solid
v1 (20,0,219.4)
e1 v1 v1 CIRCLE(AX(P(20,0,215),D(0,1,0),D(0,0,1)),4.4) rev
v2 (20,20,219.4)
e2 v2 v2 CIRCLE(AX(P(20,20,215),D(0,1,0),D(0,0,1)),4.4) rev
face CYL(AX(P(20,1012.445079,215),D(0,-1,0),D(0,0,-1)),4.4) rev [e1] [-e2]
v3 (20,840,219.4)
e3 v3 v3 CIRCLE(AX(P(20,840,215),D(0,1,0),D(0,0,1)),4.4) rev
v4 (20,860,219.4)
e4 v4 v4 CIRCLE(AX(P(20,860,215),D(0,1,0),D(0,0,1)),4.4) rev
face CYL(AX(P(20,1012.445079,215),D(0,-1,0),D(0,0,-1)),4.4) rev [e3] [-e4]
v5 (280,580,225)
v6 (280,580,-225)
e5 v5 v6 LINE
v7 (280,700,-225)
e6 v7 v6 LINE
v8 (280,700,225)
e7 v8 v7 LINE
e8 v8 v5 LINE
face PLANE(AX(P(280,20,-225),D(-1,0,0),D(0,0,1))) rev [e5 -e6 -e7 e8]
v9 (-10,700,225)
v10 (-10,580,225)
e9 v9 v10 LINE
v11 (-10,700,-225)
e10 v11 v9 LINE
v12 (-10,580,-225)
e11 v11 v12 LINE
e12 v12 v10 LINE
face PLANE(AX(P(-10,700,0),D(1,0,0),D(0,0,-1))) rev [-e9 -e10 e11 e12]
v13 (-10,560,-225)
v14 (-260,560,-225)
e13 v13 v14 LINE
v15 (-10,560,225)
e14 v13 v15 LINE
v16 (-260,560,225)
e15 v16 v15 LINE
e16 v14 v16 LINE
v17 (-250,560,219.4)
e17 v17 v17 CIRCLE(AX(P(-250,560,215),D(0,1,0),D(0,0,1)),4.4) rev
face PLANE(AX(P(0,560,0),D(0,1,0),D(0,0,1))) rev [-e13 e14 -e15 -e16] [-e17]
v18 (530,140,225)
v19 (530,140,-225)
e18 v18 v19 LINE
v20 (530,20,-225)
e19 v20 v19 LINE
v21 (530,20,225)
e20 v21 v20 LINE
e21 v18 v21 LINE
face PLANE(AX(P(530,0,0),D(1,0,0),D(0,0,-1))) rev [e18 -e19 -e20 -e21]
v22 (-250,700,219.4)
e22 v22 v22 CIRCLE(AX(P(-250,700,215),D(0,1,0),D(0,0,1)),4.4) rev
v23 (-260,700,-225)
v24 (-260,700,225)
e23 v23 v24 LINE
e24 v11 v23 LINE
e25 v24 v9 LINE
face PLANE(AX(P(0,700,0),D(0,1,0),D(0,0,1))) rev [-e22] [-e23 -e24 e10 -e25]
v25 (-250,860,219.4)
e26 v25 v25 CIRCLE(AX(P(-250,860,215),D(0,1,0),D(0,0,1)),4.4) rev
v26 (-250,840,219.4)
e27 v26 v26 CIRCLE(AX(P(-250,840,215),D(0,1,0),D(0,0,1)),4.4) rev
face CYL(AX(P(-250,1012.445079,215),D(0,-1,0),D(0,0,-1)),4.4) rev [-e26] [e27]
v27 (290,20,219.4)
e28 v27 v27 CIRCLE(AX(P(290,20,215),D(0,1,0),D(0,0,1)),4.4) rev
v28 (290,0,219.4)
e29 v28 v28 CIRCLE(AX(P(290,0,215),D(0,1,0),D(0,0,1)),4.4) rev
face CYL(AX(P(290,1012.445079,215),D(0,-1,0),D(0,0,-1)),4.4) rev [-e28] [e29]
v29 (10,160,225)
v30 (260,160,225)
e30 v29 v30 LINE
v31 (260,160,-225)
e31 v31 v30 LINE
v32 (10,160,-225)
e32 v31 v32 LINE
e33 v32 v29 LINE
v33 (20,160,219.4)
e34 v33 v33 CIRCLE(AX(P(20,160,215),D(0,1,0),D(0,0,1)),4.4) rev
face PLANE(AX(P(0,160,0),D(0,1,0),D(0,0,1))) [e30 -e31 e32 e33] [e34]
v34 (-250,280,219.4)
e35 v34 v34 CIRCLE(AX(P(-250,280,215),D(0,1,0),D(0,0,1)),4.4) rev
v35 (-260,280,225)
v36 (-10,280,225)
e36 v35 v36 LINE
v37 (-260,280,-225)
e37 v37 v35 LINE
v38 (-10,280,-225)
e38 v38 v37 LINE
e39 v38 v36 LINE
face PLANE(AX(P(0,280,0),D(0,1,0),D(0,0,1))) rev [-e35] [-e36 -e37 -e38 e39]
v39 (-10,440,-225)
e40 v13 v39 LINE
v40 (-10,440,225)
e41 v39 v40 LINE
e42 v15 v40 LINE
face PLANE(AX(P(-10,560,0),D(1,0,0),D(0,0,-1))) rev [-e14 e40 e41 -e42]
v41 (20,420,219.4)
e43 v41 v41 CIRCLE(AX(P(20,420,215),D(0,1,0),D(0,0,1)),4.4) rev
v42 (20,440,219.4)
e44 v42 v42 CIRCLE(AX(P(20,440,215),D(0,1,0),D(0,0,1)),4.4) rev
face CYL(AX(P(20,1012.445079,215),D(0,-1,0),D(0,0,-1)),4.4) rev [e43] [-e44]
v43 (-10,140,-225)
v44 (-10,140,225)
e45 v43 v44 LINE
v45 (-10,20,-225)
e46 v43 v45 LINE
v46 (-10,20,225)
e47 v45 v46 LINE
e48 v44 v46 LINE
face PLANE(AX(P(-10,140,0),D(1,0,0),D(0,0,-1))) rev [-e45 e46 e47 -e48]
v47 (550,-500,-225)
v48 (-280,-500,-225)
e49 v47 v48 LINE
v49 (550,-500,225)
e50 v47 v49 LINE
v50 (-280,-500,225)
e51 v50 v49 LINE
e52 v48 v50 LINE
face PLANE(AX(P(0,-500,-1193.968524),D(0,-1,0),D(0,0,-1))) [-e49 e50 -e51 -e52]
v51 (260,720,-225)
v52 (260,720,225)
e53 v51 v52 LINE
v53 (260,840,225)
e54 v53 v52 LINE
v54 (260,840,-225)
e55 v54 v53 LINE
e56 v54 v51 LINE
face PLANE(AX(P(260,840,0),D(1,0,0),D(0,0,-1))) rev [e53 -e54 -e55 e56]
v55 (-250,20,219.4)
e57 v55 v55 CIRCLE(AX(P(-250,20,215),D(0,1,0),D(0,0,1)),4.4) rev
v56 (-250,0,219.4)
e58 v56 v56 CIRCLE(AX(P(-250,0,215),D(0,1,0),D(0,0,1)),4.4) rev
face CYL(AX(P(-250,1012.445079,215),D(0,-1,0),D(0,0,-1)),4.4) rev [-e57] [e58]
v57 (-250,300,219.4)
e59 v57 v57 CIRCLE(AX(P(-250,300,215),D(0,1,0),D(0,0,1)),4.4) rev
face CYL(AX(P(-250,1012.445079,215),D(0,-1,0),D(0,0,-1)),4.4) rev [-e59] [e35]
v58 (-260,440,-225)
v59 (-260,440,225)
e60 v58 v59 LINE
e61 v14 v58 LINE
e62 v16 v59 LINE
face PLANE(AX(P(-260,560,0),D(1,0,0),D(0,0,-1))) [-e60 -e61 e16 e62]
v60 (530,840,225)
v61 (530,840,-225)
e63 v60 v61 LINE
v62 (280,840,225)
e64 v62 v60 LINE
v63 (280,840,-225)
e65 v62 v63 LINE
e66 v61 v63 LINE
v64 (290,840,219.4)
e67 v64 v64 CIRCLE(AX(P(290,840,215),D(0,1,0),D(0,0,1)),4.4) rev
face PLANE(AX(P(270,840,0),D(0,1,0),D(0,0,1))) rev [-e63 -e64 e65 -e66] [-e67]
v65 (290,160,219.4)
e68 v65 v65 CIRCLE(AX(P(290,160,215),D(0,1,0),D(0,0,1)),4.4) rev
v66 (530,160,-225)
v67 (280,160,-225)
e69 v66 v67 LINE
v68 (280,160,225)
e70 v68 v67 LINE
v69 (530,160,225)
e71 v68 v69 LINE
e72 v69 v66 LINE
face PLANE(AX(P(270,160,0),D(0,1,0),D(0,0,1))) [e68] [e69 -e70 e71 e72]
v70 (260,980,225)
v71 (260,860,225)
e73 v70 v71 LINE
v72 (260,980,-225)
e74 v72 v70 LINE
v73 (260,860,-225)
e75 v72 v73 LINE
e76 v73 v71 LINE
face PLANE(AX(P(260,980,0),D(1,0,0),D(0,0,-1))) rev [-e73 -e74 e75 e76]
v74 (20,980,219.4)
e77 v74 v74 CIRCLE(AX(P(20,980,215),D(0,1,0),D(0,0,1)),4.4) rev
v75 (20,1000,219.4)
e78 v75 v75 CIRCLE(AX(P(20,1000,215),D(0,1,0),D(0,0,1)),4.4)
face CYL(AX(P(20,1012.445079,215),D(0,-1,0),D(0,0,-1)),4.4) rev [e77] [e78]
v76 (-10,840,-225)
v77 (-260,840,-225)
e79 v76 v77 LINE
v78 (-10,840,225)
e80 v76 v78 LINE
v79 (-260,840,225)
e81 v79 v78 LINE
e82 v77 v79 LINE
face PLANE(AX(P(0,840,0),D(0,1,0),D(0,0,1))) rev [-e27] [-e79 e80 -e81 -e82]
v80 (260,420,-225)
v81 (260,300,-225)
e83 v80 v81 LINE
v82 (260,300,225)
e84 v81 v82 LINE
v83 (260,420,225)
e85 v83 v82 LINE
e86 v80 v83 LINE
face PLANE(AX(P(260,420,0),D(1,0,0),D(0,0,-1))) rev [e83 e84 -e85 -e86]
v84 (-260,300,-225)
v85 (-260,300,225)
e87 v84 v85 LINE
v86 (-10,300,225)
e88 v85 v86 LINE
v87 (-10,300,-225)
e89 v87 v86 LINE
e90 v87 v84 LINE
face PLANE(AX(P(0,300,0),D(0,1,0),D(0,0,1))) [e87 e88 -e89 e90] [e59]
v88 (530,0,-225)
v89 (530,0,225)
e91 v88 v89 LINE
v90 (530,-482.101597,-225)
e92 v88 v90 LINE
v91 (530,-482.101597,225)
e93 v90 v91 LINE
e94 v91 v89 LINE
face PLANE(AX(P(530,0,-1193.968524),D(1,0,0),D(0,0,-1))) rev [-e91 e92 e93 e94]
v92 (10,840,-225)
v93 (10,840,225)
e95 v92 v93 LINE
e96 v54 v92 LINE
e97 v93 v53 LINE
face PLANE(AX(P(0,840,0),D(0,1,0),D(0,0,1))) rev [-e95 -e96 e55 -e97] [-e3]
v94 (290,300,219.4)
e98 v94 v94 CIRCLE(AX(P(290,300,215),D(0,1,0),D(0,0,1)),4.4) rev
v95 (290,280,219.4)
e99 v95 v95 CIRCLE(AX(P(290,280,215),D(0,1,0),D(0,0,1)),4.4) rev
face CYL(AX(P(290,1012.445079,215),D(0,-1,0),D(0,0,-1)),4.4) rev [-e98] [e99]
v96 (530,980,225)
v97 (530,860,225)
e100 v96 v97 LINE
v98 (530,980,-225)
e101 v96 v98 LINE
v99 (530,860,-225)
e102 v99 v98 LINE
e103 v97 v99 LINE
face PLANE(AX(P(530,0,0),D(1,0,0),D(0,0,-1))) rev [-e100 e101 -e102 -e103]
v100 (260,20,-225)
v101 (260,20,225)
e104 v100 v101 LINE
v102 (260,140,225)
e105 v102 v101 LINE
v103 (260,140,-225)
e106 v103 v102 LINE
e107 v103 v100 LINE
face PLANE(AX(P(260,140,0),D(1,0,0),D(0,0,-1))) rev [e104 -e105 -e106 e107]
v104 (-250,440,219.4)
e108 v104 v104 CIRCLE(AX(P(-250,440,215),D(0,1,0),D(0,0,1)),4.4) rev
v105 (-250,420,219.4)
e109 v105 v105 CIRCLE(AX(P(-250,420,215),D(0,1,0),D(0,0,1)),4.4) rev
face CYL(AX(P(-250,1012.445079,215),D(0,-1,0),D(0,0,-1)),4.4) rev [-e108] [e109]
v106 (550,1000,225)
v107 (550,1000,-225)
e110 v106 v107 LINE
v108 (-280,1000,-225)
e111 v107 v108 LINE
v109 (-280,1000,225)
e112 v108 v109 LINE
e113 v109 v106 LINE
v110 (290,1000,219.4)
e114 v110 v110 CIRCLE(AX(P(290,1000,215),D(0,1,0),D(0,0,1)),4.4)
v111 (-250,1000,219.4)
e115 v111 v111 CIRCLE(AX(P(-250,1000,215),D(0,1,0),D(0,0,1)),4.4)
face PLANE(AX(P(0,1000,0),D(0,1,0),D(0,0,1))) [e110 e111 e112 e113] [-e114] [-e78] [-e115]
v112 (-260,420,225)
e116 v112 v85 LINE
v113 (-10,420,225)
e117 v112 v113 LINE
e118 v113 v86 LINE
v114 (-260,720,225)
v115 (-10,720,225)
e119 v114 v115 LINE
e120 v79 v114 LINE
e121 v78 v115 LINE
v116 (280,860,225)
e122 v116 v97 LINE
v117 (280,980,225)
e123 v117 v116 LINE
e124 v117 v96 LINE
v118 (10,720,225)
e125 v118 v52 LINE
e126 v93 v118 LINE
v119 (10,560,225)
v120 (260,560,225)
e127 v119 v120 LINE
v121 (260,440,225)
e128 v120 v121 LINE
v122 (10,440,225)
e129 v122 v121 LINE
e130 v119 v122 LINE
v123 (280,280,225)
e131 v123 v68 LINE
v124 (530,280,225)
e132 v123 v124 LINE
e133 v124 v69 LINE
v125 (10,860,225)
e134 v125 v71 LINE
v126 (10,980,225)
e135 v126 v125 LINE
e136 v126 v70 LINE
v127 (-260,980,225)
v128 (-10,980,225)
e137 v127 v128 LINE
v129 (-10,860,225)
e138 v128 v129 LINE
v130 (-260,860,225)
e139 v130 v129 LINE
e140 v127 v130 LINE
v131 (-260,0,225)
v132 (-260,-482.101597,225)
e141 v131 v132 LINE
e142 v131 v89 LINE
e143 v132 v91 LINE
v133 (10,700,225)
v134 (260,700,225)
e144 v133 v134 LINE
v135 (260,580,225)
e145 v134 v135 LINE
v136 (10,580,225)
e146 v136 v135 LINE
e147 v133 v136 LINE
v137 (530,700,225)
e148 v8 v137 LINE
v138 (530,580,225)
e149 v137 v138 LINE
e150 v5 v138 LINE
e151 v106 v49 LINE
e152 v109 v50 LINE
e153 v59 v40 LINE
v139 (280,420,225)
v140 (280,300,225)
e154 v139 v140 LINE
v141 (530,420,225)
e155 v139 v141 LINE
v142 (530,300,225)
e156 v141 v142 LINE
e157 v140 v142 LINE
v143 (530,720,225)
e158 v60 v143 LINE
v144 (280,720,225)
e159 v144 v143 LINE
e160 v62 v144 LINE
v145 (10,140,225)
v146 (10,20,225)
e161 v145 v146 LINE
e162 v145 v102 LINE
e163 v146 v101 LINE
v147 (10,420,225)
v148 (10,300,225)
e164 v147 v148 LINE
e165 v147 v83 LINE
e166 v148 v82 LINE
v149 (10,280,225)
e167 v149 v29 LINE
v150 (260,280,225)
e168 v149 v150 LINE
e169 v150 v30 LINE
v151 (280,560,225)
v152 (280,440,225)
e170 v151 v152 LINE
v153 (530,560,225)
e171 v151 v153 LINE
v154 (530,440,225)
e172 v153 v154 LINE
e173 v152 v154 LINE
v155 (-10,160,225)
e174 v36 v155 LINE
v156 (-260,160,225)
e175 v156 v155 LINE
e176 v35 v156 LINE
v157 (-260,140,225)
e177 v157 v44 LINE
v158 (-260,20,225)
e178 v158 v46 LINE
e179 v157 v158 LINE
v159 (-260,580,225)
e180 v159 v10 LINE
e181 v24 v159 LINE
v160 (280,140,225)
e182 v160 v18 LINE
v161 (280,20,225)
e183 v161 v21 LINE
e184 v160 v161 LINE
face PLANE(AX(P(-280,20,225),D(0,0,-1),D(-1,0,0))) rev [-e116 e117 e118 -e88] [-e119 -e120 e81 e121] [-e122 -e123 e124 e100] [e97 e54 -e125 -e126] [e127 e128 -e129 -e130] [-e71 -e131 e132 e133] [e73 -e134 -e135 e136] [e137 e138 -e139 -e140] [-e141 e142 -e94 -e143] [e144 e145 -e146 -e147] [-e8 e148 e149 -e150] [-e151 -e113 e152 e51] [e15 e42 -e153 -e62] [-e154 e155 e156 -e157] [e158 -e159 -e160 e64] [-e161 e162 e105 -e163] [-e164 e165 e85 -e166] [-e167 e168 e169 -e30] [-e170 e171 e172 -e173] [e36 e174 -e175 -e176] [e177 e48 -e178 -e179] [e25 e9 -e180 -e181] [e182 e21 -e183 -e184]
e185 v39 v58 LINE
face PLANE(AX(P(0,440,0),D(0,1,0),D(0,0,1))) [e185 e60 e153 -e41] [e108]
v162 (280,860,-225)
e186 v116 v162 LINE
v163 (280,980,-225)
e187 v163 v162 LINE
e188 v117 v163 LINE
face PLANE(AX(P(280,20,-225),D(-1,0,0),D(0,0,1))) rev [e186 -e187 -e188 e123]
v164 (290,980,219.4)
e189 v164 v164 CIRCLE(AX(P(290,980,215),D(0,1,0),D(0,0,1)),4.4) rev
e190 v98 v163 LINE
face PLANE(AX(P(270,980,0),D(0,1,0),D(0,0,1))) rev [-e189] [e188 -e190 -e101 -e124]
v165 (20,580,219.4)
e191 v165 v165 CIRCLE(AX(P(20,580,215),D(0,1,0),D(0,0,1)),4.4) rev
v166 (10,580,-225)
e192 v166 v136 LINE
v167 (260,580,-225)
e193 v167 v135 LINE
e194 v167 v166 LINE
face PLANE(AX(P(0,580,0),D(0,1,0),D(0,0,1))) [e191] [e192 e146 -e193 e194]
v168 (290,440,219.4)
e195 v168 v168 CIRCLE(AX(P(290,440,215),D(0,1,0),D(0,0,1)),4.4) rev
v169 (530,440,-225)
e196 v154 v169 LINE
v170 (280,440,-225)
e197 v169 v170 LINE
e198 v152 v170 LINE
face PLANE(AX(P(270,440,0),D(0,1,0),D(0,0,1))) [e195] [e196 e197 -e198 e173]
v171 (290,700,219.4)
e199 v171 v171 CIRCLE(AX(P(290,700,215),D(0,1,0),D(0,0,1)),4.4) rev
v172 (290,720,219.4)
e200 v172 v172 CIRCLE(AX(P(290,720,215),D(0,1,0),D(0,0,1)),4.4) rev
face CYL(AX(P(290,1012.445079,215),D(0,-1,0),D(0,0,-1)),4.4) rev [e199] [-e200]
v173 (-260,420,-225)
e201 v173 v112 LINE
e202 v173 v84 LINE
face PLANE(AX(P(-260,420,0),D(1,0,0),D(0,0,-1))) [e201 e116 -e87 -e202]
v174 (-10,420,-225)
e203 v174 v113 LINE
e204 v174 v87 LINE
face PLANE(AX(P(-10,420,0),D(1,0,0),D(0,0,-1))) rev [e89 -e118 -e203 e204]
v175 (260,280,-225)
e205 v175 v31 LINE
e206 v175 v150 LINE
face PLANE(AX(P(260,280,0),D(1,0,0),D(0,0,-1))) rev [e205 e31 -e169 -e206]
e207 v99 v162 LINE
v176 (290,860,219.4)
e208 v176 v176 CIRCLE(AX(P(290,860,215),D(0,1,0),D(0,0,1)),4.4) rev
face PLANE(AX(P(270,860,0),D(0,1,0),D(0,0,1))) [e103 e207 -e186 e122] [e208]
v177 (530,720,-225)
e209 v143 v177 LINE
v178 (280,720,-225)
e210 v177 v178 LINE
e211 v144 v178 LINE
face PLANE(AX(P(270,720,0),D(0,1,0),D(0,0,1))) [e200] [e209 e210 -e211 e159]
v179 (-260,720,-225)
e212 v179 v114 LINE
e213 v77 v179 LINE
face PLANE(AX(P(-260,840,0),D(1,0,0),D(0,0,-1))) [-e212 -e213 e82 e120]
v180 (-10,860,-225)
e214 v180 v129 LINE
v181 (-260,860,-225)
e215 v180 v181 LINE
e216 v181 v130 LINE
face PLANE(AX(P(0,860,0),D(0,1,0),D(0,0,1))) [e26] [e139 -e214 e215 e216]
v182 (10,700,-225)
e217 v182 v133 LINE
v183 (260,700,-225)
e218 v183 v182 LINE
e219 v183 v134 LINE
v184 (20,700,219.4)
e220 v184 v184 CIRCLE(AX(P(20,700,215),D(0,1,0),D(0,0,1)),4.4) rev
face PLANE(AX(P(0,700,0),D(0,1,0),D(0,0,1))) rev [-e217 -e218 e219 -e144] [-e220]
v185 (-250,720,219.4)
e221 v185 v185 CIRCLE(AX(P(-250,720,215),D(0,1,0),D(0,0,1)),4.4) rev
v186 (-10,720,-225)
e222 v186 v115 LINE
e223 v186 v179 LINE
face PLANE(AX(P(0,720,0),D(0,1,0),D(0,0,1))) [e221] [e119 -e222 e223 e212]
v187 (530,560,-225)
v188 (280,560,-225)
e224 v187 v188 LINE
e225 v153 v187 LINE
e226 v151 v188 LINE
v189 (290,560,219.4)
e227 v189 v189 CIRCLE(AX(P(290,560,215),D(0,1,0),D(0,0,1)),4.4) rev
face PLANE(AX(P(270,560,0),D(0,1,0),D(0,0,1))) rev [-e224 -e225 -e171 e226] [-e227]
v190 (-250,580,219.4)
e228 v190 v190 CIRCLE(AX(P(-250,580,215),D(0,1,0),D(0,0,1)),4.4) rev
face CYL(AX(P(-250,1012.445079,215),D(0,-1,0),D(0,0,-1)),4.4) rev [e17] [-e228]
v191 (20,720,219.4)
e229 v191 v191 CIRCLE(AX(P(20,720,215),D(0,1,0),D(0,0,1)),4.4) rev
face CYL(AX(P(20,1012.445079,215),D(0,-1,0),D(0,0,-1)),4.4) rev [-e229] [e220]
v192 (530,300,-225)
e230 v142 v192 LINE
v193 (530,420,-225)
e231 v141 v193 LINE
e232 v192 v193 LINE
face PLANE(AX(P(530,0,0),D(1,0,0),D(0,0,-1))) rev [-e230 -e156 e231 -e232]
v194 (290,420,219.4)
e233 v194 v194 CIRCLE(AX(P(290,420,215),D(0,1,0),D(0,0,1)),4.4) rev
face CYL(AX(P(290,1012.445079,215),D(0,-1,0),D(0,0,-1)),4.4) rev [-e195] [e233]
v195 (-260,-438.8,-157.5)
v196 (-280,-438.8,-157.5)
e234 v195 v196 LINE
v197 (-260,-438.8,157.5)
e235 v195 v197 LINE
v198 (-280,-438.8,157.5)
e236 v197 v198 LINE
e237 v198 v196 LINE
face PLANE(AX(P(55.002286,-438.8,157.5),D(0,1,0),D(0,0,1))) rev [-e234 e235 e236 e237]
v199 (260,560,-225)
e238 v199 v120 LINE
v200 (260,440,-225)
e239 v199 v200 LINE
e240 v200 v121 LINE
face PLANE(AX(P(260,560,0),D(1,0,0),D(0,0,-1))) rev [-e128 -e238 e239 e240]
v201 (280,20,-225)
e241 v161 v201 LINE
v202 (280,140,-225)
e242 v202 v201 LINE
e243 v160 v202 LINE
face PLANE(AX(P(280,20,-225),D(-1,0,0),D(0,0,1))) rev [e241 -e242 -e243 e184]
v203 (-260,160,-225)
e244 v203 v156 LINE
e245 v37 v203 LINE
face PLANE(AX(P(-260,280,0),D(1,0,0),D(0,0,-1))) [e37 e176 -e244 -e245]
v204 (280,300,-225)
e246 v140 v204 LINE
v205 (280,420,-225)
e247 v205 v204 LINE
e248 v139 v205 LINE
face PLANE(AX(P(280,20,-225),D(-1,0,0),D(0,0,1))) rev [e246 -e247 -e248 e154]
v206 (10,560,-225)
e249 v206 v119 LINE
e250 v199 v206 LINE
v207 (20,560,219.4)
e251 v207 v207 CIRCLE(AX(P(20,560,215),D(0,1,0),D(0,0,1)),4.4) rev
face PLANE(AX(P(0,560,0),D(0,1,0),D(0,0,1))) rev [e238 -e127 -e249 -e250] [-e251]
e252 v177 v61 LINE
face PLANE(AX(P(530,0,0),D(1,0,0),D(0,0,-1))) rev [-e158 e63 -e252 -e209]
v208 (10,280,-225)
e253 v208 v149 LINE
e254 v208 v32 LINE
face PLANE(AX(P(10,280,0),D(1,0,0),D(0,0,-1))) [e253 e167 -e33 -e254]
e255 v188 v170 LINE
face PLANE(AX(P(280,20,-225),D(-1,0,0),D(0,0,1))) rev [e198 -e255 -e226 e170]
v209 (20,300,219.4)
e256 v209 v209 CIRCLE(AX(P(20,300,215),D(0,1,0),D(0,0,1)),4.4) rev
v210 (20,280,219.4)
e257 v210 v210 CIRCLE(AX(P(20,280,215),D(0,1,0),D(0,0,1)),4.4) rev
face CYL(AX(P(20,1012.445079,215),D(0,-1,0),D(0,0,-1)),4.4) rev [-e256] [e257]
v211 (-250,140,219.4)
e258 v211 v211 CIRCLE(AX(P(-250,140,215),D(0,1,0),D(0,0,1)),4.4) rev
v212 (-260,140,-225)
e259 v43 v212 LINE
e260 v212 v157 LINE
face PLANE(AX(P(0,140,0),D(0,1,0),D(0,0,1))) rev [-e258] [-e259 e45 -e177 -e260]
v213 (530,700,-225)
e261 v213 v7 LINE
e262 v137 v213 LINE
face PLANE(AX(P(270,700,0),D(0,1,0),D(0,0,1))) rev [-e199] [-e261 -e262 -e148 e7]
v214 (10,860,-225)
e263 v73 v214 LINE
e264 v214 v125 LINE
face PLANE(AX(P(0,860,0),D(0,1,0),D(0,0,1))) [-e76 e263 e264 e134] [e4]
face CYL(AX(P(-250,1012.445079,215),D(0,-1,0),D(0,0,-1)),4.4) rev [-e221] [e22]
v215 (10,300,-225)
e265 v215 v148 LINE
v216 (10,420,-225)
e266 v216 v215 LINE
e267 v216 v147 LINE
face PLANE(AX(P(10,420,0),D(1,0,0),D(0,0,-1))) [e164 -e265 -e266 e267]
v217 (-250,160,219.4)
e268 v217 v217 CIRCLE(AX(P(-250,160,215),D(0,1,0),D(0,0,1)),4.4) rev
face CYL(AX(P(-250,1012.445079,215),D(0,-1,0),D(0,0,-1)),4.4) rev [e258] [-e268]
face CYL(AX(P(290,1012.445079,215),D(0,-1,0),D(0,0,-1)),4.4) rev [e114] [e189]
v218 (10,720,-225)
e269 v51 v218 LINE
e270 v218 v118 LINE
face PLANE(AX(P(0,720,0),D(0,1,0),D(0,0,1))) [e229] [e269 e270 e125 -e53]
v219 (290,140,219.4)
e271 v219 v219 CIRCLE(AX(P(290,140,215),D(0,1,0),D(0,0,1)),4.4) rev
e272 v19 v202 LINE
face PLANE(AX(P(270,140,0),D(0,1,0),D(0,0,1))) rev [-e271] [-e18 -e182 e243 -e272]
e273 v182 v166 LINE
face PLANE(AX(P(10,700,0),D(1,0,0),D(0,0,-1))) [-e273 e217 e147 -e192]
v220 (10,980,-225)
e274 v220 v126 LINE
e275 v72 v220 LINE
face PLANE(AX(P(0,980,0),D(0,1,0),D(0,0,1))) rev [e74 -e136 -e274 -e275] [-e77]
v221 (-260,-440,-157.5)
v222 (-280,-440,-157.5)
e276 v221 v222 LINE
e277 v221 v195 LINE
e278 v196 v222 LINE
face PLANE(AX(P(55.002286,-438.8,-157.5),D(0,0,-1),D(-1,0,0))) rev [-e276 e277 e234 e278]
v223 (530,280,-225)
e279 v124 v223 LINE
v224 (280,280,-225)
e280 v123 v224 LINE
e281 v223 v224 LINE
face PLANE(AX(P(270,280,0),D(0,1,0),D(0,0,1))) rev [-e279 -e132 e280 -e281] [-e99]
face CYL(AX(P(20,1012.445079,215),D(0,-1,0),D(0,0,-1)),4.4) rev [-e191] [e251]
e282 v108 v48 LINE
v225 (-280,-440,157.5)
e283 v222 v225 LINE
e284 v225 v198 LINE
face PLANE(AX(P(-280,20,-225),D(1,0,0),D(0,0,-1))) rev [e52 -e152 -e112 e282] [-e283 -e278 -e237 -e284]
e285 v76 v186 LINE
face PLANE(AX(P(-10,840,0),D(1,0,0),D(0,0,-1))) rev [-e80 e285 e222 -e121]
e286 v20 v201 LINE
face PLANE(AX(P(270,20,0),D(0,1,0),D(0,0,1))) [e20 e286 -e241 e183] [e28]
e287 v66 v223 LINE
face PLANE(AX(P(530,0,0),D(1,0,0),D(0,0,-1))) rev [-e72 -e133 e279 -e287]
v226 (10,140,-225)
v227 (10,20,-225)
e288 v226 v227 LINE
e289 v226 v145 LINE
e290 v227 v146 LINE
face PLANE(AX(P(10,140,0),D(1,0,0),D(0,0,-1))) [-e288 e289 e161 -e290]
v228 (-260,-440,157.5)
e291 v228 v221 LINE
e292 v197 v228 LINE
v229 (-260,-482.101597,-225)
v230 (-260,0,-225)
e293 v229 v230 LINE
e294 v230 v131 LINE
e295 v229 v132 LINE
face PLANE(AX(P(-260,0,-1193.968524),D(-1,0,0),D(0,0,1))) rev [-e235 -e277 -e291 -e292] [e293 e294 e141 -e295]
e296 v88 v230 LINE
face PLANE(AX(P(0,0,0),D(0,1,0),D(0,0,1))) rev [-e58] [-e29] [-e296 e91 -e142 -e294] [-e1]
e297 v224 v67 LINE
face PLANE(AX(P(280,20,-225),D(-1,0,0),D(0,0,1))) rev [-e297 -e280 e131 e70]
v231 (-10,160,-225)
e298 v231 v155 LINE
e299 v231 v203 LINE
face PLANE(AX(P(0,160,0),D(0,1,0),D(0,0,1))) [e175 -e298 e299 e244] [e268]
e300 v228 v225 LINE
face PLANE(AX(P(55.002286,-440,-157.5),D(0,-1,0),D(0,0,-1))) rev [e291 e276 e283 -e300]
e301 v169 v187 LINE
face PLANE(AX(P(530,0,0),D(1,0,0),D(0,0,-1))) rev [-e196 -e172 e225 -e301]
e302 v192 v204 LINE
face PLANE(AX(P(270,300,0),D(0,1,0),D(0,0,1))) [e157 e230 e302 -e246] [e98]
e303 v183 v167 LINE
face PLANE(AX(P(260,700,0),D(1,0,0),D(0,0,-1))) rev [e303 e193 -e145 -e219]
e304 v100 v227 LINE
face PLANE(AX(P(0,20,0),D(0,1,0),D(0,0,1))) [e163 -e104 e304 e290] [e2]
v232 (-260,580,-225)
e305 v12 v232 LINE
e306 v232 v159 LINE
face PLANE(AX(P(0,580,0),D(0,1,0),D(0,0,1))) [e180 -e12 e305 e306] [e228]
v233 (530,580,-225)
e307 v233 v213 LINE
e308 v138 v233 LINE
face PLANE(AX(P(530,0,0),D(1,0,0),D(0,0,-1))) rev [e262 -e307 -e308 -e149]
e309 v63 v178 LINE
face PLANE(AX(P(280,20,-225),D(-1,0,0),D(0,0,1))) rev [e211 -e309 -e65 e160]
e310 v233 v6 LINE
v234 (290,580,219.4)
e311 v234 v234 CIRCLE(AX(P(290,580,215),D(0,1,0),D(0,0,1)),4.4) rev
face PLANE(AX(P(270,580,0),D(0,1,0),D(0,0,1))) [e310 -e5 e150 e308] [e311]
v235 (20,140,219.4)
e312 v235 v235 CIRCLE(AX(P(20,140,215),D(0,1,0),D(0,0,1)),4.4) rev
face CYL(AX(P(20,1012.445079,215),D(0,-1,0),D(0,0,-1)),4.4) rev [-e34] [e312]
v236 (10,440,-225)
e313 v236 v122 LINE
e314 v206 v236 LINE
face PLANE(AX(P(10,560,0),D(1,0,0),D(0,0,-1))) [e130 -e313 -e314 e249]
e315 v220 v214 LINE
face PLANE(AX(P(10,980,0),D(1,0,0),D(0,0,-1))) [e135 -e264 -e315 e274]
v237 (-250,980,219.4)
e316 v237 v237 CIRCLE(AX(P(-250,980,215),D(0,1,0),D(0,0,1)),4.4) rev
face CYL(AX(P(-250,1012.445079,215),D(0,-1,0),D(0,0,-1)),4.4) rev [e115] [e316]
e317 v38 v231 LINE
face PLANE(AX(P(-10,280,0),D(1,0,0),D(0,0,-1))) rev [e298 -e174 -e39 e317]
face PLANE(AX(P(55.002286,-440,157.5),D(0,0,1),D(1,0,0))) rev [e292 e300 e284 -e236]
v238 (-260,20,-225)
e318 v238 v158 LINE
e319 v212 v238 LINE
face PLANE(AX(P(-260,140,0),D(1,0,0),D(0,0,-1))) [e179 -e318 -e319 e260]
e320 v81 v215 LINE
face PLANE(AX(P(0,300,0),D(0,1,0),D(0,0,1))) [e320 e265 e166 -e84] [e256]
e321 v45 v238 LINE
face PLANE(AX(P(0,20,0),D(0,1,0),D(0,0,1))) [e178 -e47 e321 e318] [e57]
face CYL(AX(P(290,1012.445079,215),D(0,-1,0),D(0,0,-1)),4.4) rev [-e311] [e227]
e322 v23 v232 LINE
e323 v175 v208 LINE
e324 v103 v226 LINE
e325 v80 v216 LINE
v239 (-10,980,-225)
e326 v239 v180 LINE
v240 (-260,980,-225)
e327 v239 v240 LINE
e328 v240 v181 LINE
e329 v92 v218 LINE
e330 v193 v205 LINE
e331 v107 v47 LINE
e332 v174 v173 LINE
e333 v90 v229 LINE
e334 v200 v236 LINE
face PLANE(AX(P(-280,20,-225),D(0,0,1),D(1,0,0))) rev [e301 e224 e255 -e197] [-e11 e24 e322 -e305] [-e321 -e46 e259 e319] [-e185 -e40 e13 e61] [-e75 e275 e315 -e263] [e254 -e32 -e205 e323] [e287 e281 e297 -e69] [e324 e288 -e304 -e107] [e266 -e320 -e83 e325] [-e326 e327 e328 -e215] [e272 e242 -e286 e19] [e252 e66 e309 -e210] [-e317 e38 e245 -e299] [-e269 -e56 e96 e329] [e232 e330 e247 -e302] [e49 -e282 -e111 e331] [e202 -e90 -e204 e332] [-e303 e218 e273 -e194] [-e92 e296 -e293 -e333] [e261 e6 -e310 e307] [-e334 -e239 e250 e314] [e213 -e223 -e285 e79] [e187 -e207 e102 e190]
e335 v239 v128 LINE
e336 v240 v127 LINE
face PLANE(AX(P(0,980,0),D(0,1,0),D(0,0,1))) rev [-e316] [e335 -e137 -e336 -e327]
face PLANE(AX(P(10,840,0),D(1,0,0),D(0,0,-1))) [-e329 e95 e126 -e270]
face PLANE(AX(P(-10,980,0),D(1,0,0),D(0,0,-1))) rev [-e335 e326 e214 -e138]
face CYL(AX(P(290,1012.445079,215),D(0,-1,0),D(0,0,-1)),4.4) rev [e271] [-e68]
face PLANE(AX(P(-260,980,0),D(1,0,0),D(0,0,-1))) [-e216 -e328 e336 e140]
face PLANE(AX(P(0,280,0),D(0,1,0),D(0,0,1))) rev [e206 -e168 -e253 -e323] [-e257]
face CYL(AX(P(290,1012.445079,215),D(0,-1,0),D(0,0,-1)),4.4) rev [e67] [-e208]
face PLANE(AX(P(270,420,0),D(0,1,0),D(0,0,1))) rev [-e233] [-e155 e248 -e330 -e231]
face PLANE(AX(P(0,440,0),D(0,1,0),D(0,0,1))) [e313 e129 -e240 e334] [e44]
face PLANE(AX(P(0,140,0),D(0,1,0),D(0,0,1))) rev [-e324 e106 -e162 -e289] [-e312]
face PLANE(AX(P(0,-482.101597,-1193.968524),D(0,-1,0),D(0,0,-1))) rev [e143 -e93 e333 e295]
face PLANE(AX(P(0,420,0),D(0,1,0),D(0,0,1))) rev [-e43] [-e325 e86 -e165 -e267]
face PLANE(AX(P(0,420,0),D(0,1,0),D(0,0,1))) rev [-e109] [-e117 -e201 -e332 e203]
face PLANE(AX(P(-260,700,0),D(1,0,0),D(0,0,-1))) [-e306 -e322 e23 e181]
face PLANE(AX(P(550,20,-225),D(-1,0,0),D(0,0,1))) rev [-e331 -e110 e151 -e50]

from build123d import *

# Parameters (mm, degrees)
SKETCH1_W                      = 560
SKETCH1_H                      = 450
BOSS_EXTRUDE1_DEPTH            = 20
SKETCH3_W                      = 20
SKETCH3_H                      = 450
BOSS_EXTRUDE2_DEPTH            = 120
LPATTERN2_COUNT                = 7
LPATTERN2_PITCH                = 140
LPATTERN5_COUNT                = 2
LPATTERN5_PITCH                = 270
LPATTERN5_COUNT_DIR2           = 14
LPATTERN5_PITCH_DIR2           = 140
SKETCH6_W                      = 450
SKETCH6_H                      = 1000
BOSS_EXTRUDE5_DEPTH            = 20
BOSS_EXTRUDE6_DEPTH            = 450
CUT_EXTRUDE1_REACH             = 1486.158
SKETCH10_R                     = 4.4
CUT_EXTRUDE1_DIRECTION_2_REACH = 1486.158
LPATTERN6_COUNT                = 3
LPATTERN6_PITCH                = 270
SKETCH13_W                     = 315
SKETCH13_H                     = 1.2
CUT_EXTRUDE3_DEPTH             = 20


with BuildPart() as part:
    # Sketch1 → Boss-Extrude1 (new body)
    with BuildSketch(Plane(origin=(0, 0, 0), x_dir=(1, 0, 0), z_dir=(0, 1, 0))):
        Rectangle(SKETCH1_W, SKETCH1_H)
    boss_extrude1 = extrude(amount=BOSS_EXTRUDE1_DEPTH)

    # Sketch3 → Boss-Extrude2 (add)
    with BuildSketch(Plane(origin=(0, 20, 0), x_dir=(1, 0, 0), z_dir=(0, 1, 0))):
        with Locations((-270, 0)):
            Rectangle(SKETCH3_W, SKETCH3_H)
        Rectangle(SKETCH3_W, SKETCH3_H)
        with Locations((270, 0)):
            Rectangle(SKETCH3_W, SKETCH3_H)
    extrude(amount=BOSS_EXTRUDE2_DEPTH)


with BuildPart() as lpattern2_1:
    # LPattern2: pattern copy
    add(part.part.moved(Location(Vector(0, 1, 0) * (1 * LPATTERN2_PITCH))))


with BuildPart() as lpattern2_2:
    # LPattern2: pattern copy
    add(part.part.moved(Location(Vector(0, 1, 0) * (2 * LPATTERN2_PITCH))))


with BuildPart() as lpattern2_3:
    # LPattern2: pattern copy
    add(part.part.moved(Location(Vector(0, 1, 0) * (3 * LPATTERN2_PITCH))))


with BuildPart() as lpattern2_4:
    # LPattern2: pattern copy
    add(part.part.moved(Location(Vector(0, 1, 0) * (4 * LPATTERN2_PITCH))))


with BuildPart() as lpattern2_5:
    # LPattern2: pattern copy
    add(part.part.moved(Location(Vector(0, 1, 0) * (5 * LPATTERN2_PITCH))))


with BuildPart() as lpattern2_6:
    # LPattern2: pattern copy
    add(part.part.moved(Location(Vector(0, 1, 0) * (6 * LPATTERN2_PITCH))))


with BuildPart() as lpattern5_1:
    # LPattern5: pattern copy
    add(boss_extrude1.moved(Location(Vector(1, 0, 0) * (0 * LPATTERN5_PITCH) + Vector(0, 1, 0) * (1 * LPATTERN5_PITCH_DIR2))))


with BuildPart() as lpattern5_2:
    # LPattern5: pattern copy
    add(boss_extrude1.moved(Location(Vector(1, 0, 0) * (0 * LPATTERN5_PITCH) + Vector(0, 1, 0) * (2 * LPATTERN5_PITCH_DIR2))))


with BuildPart() as lpattern5_3:
    # LPattern5: pattern copy
    add(boss_extrude1.moved(Location(Vector(1, 0, 0) * (0 * LPATTERN5_PITCH) + Vector(0, 1, 0) * (3 * LPATTERN5_PITCH_DIR2))))


with BuildPart() as lpattern5_4:
    # LPattern5: pattern copy
    add(boss_extrude1.moved(Location(Vector(1, 0, 0) * (0 * LPATTERN5_PITCH) + Vector(0, 1, 0) * (4 * LPATTERN5_PITCH_DIR2))))


with BuildPart() as lpattern5_5:
    # LPattern5: pattern copy
    add(boss_extrude1.moved(Location(Vector(1, 0, 0) * (0 * LPATTERN5_PITCH) + Vector(0, 1, 0) * (5 * LPATTERN5_PITCH_DIR2))))


with BuildPart() as lpattern5_6:
    # LPattern5: pattern copy
    add(boss_extrude1.moved(Location(Vector(1, 0, 0) * (0 * LPATTERN5_PITCH) + Vector(0, 1, 0) * (6 * LPATTERN5_PITCH_DIR2))))


with BuildPart() as lpattern5_7:
    # LPattern5: pattern copy
    add(boss_extrude1.moved(Location(Vector(1, 0, 0) * (0 * LPATTERN5_PITCH) + Vector(0, 1, 0) * (7 * LPATTERN5_PITCH_DIR2))))


with BuildPart() as lpattern5_8:
    # LPattern5: pattern copy
    add(boss_extrude1.moved(Location(Vector(1, 0, 0) * (1 * LPATTERN5_PITCH) + Vector(0, 1, 0) * (0 * LPATTERN5_PITCH_DIR2))))


with BuildPart() as lpattern5_9:
    # LPattern5: pattern copy
    add(boss_extrude1.moved(Location(Vector(1, 0, 0) * (1 * LPATTERN5_PITCH) + Vector(0, 1, 0) * (1 * LPATTERN5_PITCH_DIR2))))


with BuildPart() as lpattern5_10:
    # LPattern5: pattern copy
    add(boss_extrude1.moved(Location(Vector(1, 0, 0) * (1 * LPATTERN5_PITCH) + Vector(0, 1, 0) * (2 * LPATTERN5_PITCH_DIR2))))


with BuildPart() as lpattern5_11:
    # LPattern5: pattern copy
    add(boss_extrude1.moved(Location(Vector(1, 0, 0) * (1 * LPATTERN5_PITCH) + Vector(0, 1, 0) * (3 * LPATTERN5_PITCH_DIR2))))


with BuildPart() as lpattern5_12:
    # LPattern5: pattern copy
    add(boss_extrude1.moved(Location(Vector(1, 0, 0) * (1 * LPATTERN5_PITCH) + Vector(0, 1, 0) * (4 * LPATTERN5_PITCH_DIR2))))


with BuildPart() as lpattern5_13:
    # LPattern5: pattern copy
    add(boss_extrude1.moved(Location(Vector(1, 0, 0) * (1 * LPATTERN5_PITCH) + Vector(0, 1, 0) * (5 * LPATTERN5_PITCH_DIR2))))


with BuildPart() as lpattern5_14:
    # LPattern5: pattern copy
    add(boss_extrude1.moved(Location(Vector(1, 0, 0) * (1 * LPATTERN5_PITCH) + Vector(0, 1, 0) * (6 * LPATTERN5_PITCH_DIR2))))


with BuildPart() as lpattern5_15:
    # LPattern5: pattern copy
    add(boss_extrude1.moved(Location(Vector(1, 0, 0) * (1 * LPATTERN5_PITCH) + Vector(0, 1, 0) * (7 * LPATTERN5_PITCH_DIR2))))


with BuildPart() as part_1:
    add(part.part)

    # LPattern5 united with what the copies to: union LPattern2_1, LPattern2_2, LPattern2_3, LPattern2_4, LPattern2_5, LPattern2_6, LPattern5_1, LPattern5_2, LPattern5_3, LPattern5_4, LPattern5_5, LPattern5_6, LPattern5_7, LPattern5_8, LPattern5_9, LPattern5_10, LPattern5_11, LPattern5_12, LPattern5_13, LPattern5_14, LPattern5_15
    add(lpattern2_1.part)
    add(lpattern2_2.part)
    add(lpattern2_3.part)
    add(lpattern2_4.part)
    add(lpattern2_5.part)
    add(lpattern2_6.part)
    add(lpattern5_1.part)
    add(lpattern5_2.part)
    add(lpattern5_3.part)
    add(lpattern5_4.part)
    add(lpattern5_5.part)
    add(lpattern5_6.part)
    add(lpattern5_7.part)
    add(lpattern5_8.part)
    add(lpattern5_9.part)
    add(lpattern5_10.part)
    add(lpattern5_11.part)
    add(lpattern5_12.part)
    add(lpattern5_13.part)
    add(lpattern5_14.part)
    add(lpattern5_15.part)

    # Sketch6 → Boss-Extrude5 (add)
    with BuildSketch(Plane(origin=(550, 0, 0), x_dir=(0, 0, -1), z_dir=(1, 0, 0))):
        with Locations((0, 500)):
            Rectangle(SKETCH6_W, SKETCH6_H)
    extrude(amount=-BOSS_EXTRUDE5_DEPTH)

    # Sketch9 → Boss-Extrude6 (add)
    with BuildSketch(Plane.XY.offset(225)):
        Polygon((-260, -482.101596541), (-260, 0), (-280, 0), (-280, -500), (550, -500), (550, 0), (530, 0), (530, -482.101596541), align=None)
    extrude(amount=-BOSS_EXTRUDE6_DEPTH)

    # Cut-Extrude1: up to this face of the body (flat: up to its plane)
    cut_extrude1_end = Plane(part_1.part.faces().sort_by_distance((135, 1000, 0))[0])
    # Sketch10 → Cut-Extrude1 (cut, up to the picked face)
    with BuildSketch(Plane(origin=(0, 860, 0), x_dir=(1, 0, 0), z_dir=(0, 1, 0)), mode=Mode.PRIVATE) as cut_extrude1_sk1:
        with Locations(Location((-250, -215, 0), (0, 0, 270))):
            Circle(SKETCH10_R)
    cut_extrude1_tool1 = split(extrude(cut_extrude1_sk1.sketch, amount=CUT_EXTRUDE1_REACH, mode=Mode.PRIVATE), bisect_by=cut_extrude1_end, keep=Keep.BOTH, mode=Mode.PRIVATE)
    cut_extrude1 = cut_extrude1_tool1.solids().sort_by(Axis((-250, 860, 215), (0, 1, 0)))[0]
    add(cut_extrude1, mode=Mode.SUBTRACT)

    # Cut-Extrude1 direction 2: up to this face of the body (flat: up to its plane)
    cut_extrude1_direction_2_end = Plane(part_1.part.faces().sort_by_distance((135, 0, 0))[0])
    # Sketch10 → Cut-Extrude1 direction 2 (cut, up to the picked face)
    with BuildSketch(Plane(origin=(0, 860, 0), x_dir=(1, 0, 0), z_dir=(0, 1, 0)), mode=Mode.PRIVATE) as cut_extrude1_direction_2_sk1:
        with Locations(Location((-250, -215, 0), (0, 0, 270))):
            Circle(SKETCH10_R)
    cut_extrude1_direction_2_tool1 = split(extrude(cut_extrude1_direction_2_sk1.sketch, amount=-CUT_EXTRUDE1_DIRECTION_2_REACH, mode=Mode.PRIVATE), bisect_by=cut_extrude1_direction_2_end, keep=Keep.BOTH, mode=Mode.PRIVATE)
    cut_extrude1_direction_2 = cut_extrude1_direction_2_tool1.solids().sort_by(Axis((-250, 860, 215), (0, -1, 0)))[0]
    add(cut_extrude1_direction_2, mode=Mode.SUBTRACT)

    # LPattern6: Cut-Extrude1, Cut-Extrude1 direction 2 ×3
    with Locations(*[(i * LPATTERN6_PITCH, 0, 0) for i in range(1, LPATTERN6_COUNT)]):
        add(cut_extrude1, mode=Mode.SUBTRACT)
        add(cut_extrude1_direction_2, mode=Mode.SUBTRACT)

    # Sketch13 → Cut-Extrude3 (cut)
    with BuildSketch(Plane.ZY.offset(280)):
        with Locations((0, -439.4)):
            Rectangle(SKETCH13_W, SKETCH13_H)
    extrude(amount=-CUT_EXTRUDE3_DEPTH, mode=Mode.SUBTRACT)


solid = part_1.part
